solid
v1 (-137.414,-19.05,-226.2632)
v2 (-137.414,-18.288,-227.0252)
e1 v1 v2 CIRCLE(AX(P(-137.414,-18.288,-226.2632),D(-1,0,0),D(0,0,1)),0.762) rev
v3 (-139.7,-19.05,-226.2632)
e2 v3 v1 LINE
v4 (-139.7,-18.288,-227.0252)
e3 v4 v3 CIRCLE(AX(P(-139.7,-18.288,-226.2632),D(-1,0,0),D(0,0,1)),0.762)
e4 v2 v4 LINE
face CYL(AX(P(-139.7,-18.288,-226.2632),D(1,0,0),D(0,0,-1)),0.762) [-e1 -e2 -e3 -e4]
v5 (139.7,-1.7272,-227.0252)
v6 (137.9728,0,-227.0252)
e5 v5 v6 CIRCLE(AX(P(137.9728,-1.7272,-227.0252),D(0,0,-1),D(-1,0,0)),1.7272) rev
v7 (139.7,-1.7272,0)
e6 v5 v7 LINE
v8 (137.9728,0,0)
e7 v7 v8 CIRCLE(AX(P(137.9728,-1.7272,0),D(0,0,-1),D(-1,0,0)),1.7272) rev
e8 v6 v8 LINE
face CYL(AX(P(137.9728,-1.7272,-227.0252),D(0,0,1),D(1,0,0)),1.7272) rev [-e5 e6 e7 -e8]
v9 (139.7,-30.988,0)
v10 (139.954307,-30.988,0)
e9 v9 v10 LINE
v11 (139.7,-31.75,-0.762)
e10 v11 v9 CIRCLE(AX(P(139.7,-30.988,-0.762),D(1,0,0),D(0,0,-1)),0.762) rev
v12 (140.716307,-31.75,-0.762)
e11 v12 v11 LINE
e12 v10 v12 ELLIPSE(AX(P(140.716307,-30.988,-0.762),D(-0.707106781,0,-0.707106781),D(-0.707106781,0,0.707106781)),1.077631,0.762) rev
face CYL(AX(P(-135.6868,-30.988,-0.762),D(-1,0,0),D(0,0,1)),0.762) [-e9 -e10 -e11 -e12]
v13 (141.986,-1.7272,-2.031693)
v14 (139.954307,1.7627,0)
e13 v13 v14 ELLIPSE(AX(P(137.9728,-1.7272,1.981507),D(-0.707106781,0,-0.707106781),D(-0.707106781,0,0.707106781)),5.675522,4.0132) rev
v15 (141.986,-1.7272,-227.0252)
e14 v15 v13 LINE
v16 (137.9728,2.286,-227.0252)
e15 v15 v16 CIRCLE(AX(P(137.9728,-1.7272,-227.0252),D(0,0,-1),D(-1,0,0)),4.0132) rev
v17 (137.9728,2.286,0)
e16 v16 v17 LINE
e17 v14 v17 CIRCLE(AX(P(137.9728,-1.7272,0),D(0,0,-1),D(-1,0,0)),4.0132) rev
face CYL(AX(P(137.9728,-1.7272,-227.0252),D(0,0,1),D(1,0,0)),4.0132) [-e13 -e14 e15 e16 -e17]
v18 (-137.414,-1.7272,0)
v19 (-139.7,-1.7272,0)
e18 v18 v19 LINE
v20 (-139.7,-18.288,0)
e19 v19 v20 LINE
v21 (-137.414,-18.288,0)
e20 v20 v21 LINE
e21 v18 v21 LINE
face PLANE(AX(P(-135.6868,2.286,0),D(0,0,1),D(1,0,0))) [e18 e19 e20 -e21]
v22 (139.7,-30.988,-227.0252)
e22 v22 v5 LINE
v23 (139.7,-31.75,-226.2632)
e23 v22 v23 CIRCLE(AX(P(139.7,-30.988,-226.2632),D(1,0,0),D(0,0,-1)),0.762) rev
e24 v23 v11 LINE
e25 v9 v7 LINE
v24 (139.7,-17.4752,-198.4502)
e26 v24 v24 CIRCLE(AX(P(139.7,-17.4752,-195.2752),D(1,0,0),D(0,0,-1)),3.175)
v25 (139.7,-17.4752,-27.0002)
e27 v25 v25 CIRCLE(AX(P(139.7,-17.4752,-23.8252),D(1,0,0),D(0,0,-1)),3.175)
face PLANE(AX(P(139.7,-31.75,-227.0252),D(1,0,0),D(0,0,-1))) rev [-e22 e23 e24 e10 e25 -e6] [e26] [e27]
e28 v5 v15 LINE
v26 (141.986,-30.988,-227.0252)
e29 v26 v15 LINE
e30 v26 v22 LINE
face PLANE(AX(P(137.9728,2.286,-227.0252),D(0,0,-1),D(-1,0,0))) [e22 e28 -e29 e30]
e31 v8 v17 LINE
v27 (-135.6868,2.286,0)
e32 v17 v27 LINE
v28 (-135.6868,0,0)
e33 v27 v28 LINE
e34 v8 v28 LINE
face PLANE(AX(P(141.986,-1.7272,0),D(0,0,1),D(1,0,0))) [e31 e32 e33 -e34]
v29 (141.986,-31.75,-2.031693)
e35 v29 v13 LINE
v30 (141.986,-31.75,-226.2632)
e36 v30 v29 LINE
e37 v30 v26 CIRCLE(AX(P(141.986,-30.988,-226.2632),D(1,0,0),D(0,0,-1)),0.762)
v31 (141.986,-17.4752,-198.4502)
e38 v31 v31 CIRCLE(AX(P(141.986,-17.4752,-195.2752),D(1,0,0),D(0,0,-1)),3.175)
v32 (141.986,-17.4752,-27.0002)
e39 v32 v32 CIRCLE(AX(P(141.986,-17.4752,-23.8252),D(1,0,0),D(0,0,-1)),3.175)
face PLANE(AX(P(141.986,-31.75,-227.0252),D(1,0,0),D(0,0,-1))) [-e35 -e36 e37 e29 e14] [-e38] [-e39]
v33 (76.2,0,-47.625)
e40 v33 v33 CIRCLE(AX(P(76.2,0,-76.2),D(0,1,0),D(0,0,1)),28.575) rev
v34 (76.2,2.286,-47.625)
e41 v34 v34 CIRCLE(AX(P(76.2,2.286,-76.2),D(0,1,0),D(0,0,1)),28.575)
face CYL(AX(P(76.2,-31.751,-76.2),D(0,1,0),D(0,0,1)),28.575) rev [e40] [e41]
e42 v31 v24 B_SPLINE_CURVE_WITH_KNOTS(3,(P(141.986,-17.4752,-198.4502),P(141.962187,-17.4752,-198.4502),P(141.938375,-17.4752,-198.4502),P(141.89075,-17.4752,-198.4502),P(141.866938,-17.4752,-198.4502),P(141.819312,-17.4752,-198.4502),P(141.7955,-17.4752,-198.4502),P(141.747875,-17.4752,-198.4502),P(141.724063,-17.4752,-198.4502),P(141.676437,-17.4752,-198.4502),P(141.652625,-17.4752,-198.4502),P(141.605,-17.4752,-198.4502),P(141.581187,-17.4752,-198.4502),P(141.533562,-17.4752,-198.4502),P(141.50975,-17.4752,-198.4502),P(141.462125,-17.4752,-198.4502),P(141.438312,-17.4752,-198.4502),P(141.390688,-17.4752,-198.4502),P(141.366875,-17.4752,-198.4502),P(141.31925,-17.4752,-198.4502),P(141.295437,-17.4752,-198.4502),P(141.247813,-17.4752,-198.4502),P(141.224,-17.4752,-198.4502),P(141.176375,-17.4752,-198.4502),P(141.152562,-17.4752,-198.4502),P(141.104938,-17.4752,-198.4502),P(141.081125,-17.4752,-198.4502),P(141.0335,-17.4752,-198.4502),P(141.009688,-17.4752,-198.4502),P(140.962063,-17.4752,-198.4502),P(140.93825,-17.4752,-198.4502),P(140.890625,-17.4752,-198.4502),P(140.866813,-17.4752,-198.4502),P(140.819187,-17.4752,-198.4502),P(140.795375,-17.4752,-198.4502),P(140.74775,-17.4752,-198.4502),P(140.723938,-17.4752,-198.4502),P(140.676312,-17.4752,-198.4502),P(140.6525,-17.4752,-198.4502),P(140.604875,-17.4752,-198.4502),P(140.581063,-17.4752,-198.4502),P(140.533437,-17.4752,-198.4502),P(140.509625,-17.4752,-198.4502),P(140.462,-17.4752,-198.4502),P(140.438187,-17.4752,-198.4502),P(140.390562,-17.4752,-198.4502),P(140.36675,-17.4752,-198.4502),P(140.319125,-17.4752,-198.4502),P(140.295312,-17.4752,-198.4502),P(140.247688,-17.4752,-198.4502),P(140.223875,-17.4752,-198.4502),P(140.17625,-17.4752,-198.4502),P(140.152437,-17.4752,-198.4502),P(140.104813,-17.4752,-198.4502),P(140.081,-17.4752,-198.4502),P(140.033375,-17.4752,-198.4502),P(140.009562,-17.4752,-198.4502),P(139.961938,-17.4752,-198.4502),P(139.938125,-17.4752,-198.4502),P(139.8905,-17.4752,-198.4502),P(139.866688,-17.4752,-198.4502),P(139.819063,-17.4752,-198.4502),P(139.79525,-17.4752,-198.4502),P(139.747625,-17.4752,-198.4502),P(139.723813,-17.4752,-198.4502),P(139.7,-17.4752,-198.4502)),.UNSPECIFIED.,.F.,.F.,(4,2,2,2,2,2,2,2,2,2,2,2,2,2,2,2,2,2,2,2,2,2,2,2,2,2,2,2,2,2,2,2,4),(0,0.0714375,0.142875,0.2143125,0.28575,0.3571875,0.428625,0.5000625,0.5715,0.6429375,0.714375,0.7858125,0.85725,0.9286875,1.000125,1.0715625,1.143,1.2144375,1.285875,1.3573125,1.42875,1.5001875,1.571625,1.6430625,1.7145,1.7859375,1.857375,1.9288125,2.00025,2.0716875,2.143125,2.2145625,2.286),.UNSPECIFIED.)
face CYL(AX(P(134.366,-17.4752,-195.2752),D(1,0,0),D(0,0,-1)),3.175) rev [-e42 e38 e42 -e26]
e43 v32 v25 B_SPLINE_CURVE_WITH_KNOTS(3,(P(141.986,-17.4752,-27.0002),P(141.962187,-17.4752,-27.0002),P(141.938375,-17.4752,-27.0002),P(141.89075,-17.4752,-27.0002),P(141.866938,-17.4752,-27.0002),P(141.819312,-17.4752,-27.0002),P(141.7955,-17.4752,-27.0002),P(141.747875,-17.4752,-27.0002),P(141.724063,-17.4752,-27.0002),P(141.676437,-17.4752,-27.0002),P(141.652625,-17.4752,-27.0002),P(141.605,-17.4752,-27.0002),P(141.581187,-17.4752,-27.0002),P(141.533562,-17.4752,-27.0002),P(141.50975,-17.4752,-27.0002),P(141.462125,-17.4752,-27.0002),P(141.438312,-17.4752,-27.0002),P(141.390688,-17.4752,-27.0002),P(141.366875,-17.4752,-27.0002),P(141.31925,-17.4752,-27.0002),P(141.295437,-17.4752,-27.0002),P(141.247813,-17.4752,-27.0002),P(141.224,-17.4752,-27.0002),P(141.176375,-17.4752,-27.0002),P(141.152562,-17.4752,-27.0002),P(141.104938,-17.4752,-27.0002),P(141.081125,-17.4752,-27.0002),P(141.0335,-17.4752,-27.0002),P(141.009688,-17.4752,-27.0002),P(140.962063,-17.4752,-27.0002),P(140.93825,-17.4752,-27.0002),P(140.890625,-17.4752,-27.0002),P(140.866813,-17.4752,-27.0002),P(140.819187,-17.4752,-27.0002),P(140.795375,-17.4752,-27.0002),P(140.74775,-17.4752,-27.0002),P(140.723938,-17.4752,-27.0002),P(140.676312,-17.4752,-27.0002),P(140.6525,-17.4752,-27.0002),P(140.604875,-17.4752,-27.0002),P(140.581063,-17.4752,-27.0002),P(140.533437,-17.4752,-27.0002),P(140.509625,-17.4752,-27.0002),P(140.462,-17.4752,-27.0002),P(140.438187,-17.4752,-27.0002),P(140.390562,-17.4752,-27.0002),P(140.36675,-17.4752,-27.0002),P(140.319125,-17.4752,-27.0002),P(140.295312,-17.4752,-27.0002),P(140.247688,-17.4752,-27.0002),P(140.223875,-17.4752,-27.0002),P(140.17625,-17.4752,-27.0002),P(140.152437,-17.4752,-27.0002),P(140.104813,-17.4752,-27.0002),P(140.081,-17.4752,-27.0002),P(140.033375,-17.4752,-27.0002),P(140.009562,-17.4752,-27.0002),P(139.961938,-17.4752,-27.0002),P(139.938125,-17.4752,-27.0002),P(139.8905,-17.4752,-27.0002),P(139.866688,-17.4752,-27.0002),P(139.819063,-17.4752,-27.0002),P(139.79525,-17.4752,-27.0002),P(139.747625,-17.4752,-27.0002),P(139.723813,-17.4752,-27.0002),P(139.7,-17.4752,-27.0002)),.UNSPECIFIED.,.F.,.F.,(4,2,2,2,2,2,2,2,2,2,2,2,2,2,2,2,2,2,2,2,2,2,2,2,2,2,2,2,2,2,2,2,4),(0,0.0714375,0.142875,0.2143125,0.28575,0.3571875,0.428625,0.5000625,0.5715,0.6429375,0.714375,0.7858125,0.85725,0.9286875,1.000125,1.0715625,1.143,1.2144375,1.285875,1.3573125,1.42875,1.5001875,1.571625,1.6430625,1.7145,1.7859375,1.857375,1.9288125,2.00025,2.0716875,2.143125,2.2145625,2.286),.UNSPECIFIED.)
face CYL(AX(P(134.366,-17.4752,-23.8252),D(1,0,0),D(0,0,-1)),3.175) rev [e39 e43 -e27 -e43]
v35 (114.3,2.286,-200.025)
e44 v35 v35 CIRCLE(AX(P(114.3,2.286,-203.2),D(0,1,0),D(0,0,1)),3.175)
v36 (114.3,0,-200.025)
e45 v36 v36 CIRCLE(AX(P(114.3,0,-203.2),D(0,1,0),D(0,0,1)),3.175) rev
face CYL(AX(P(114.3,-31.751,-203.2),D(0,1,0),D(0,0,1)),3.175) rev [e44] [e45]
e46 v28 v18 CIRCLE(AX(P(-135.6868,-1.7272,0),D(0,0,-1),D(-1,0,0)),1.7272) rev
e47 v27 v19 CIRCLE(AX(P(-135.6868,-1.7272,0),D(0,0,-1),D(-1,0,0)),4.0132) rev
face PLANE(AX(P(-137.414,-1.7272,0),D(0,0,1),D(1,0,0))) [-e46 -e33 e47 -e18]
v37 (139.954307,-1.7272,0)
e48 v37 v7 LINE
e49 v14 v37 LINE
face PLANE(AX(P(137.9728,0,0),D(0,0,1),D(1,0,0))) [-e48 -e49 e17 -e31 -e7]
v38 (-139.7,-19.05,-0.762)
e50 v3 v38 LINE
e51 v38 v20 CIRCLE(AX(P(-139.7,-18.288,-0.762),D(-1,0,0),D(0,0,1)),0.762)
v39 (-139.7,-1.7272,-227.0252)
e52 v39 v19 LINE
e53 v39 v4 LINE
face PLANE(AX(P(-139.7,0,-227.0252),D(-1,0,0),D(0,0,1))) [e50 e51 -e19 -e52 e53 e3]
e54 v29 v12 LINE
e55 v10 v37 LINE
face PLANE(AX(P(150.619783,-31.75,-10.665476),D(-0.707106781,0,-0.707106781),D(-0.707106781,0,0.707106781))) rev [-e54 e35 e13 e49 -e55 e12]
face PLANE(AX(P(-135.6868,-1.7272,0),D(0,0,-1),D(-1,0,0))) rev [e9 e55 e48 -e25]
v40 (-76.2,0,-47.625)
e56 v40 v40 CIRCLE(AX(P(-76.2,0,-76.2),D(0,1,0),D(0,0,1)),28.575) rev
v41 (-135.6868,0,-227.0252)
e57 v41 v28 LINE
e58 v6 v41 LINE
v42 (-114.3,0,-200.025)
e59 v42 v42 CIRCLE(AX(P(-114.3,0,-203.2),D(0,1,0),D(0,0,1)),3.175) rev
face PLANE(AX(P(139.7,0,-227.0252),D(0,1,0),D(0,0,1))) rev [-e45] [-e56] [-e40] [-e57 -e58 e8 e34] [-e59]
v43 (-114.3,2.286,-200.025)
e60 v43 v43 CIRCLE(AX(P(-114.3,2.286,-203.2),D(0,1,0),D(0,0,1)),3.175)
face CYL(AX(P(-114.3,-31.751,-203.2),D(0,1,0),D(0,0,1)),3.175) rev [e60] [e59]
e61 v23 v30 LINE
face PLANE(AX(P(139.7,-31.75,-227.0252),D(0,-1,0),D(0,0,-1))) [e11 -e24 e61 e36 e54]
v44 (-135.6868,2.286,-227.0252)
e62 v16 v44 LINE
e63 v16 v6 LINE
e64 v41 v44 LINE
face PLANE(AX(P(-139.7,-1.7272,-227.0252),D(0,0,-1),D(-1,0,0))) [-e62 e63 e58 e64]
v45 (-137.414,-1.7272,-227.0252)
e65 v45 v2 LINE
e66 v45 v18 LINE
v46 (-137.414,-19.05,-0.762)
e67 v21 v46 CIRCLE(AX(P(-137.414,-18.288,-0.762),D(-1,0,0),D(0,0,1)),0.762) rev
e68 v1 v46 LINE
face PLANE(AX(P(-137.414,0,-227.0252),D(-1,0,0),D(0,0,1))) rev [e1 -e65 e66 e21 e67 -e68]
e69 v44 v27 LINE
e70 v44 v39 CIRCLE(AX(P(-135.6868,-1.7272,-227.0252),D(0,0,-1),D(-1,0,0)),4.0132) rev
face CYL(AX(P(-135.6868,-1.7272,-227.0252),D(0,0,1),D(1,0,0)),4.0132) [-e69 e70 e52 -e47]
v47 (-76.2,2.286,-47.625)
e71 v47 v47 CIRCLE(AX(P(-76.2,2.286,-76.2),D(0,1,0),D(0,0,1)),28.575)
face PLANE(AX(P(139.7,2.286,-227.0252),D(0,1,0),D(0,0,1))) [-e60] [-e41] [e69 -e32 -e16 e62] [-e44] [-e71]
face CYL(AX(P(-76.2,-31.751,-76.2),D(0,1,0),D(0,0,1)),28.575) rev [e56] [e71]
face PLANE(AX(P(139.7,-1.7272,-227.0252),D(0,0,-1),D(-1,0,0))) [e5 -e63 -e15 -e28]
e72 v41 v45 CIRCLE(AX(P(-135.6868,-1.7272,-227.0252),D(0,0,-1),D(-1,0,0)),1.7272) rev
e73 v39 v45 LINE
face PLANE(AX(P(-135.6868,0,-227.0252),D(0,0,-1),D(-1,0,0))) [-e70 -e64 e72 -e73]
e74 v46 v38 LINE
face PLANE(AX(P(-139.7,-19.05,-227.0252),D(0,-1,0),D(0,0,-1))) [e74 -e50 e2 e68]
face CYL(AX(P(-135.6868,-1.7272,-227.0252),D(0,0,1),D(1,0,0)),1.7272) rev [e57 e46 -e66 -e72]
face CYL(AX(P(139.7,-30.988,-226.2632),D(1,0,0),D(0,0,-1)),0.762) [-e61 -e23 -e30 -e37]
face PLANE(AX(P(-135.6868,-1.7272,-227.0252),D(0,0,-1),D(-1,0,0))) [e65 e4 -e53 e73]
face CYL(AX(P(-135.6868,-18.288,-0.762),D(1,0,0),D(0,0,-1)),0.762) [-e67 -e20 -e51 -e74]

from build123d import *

# Parameters (mm, degrees)
BASE_FLANGE1_DEPTH = 227.0252
CUT_EXTRUDE1_REACH = 271.924
SKETCH2_R          = 28.575
SKETCH2_R_2        = 3.175
SKETCH3_R          = 3.175
CUT_EXTRUDE2_DEPTH = 7.62
FILLET1_R          = 0.762
CUT_EXTRUDE3_DEPTH = 270.923905809


# Sheet-metal steps are written as plain solids
with BuildPart() as part:
    # Sketch1 → Base-Flange1 (new body)
    with BuildSketch(Plane(origin=(0, 0, 0), x_dir=(-1, 0, 0), z_dir=(0, 0, -1))):
        with BuildLine():
            Line((-139.7, -31.75), (-139.7, -1.7272))
            ThreePointArc((-139.7, -1.7272), (-139.194114832, -0.505885168), (-137.9728, 0))
            Line((-137.9728, 0), (135.6868, 0))
            ThreePointArc((135.6868, 0), (136.908114832, -0.505885168), (137.414, -1.7272))
            Line((137.414, -1.7272), (137.414, -19.05))
            Line((137.414, -19.05), (139.7, -19.05))
            Line((139.7, -19.05), (139.7, -1.7272))
            ThreePointArc((139.7, -1.7272), (138.524560934, 1.110560934), (135.6868, 2.286))
            Line((135.6868, 2.286), (-137.9728, 2.286))
            ThreePointArc((-137.9728, 2.286), (-140.810560934, 1.110560934), (-141.986, -1.7272))
            Line((-141.986, -1.7272), (-141.986, -31.75))
            Line((-141.986, -31.75), (-139.7, -31.75))
        make_face()
    extrude(amount=BASE_FLANGE1_DEPTH)

    # Sketch2 → Cut-Extrude1 (cut, up to next)
    with BuildSketch(Plane(origin=(0, 2.286, 0), x_dir=(1, 0, 0), z_dir=(0, 1, 0)), mode=Mode.PRIVATE) as cut_extrude1_sk1:
        with Locations(Location((-76.2, 76.2, 0), (0, 0, 270))):
            Circle(SKETCH2_R)
    cut_extrude1_tool1 = extrude(cut_extrude1_sk1.sketch, amount=-CUT_EXTRUDE1_REACH, mode=Mode.PRIVATE) & part.part
    # Sketch2 → Cut-Extrude1 (cut, up to next)
    with BuildSketch(Plane(origin=(0, 2.286, 0), x_dir=(1, 0, 0), z_dir=(0, 1, 0)), mode=Mode.PRIVATE) as cut_extrude1_sk2:
        with Locations(Location((76.2, 76.2, 0), (0, 0, 270))):
            Circle(SKETCH2_R)
    cut_extrude1_tool2 = extrude(cut_extrude1_sk2.sketch, amount=-CUT_EXTRUDE1_REACH, mode=Mode.PRIVATE) & part.part
    # Sketch2 → Cut-Extrude1 (cut, up to next)
    with BuildSketch(Plane(origin=(0, 2.286, 0), x_dir=(1, 0, 0), z_dir=(0, 1, 0)), mode=Mode.PRIVATE) as cut_extrude1_sk3:
        with Locations(Location((114.3, 203.2, 0), (0, 0, 270))):
            Circle(SKETCH2_R_2)
    cut_extrude1_tool3 = extrude(cut_extrude1_sk3.sketch, amount=-CUT_EXTRUDE1_REACH, mode=Mode.PRIVATE) & part.part
    # Sketch2 → Cut-Extrude1 (cut, up to next)
    with BuildSketch(Plane(origin=(0, 2.286, 0), x_dir=(1, 0, 0), z_dir=(0, 1, 0)), mode=Mode.PRIVATE) as cut_extrude1_sk4:
        with Locations(Location((-114.3, 203.2, 0), (0, 0, 270))):
            Circle(SKETCH2_R_2)
    cut_extrude1_tool4 = extrude(cut_extrude1_sk4.sketch, amount=-CUT_EXTRUDE1_REACH, mode=Mode.PRIVATE) & part.part
    add(cut_extrude1_tool1.solids().sort_by_distance((-76.2, 2.286, -76.2))[0], mode=Mode.SUBTRACT)
    add(cut_extrude1_tool2.solids().sort_by_distance((76.2, 2.286, -76.2))[0], mode=Mode.SUBTRACT)
    add(cut_extrude1_tool3.solids().sort_by_distance((114.3, 2.286, -203.2))[0], mode=Mode.SUBTRACT)
    add(cut_extrude1_tool4.solids().sort_by_distance((-114.3, 2.286, -203.2))[0], mode=Mode.SUBTRACT)

    # Sketch3 → Cut-Extrude2 (cut)
    with BuildSketch(Plane(origin=(141.986, 0, 0), x_dir=(0, 0, -1), z_dir=(1, 0, 0))):
        with Locations((23.8252, -17.4752)):
            Circle(SKETCH3_R)
        with Locations((195.2752, -17.4752)):
            Circle(SKETCH3_R)
    extrude(amount=-CUT_EXTRUDE2_DEPTH, mode=Mode.SUBTRACT)

    # Fillet1
    fillet1_edges = [part.edges().sort_by_distance(p)[0] for p in [
        (140.843, -31.75, 0),
        (-138.557, -19.05, 0),
        (140.843, -31.75, -227.0252),
        (-138.557, -19.05, -227.0252),
    ]]
    fillet(fillet1_edges, radius=FILLET1_R)

    # Sketch4 → Cut-Extrude3 (cut, through all)
    with BuildSketch(Plane(origin=(0, 2.286, 0), x_dir=(1, 0, 0), z_dir=(0, 1, 0))):
        Polygon((150.619782866, 10.665476011), (128.807714722, -11.146592133), (150.619782866, -11.146592133), align=None)
    extrude(amount=-CUT_EXTRUDE3_DEPTH, mode=Mode.SUBTRACT)


solid = part.part
